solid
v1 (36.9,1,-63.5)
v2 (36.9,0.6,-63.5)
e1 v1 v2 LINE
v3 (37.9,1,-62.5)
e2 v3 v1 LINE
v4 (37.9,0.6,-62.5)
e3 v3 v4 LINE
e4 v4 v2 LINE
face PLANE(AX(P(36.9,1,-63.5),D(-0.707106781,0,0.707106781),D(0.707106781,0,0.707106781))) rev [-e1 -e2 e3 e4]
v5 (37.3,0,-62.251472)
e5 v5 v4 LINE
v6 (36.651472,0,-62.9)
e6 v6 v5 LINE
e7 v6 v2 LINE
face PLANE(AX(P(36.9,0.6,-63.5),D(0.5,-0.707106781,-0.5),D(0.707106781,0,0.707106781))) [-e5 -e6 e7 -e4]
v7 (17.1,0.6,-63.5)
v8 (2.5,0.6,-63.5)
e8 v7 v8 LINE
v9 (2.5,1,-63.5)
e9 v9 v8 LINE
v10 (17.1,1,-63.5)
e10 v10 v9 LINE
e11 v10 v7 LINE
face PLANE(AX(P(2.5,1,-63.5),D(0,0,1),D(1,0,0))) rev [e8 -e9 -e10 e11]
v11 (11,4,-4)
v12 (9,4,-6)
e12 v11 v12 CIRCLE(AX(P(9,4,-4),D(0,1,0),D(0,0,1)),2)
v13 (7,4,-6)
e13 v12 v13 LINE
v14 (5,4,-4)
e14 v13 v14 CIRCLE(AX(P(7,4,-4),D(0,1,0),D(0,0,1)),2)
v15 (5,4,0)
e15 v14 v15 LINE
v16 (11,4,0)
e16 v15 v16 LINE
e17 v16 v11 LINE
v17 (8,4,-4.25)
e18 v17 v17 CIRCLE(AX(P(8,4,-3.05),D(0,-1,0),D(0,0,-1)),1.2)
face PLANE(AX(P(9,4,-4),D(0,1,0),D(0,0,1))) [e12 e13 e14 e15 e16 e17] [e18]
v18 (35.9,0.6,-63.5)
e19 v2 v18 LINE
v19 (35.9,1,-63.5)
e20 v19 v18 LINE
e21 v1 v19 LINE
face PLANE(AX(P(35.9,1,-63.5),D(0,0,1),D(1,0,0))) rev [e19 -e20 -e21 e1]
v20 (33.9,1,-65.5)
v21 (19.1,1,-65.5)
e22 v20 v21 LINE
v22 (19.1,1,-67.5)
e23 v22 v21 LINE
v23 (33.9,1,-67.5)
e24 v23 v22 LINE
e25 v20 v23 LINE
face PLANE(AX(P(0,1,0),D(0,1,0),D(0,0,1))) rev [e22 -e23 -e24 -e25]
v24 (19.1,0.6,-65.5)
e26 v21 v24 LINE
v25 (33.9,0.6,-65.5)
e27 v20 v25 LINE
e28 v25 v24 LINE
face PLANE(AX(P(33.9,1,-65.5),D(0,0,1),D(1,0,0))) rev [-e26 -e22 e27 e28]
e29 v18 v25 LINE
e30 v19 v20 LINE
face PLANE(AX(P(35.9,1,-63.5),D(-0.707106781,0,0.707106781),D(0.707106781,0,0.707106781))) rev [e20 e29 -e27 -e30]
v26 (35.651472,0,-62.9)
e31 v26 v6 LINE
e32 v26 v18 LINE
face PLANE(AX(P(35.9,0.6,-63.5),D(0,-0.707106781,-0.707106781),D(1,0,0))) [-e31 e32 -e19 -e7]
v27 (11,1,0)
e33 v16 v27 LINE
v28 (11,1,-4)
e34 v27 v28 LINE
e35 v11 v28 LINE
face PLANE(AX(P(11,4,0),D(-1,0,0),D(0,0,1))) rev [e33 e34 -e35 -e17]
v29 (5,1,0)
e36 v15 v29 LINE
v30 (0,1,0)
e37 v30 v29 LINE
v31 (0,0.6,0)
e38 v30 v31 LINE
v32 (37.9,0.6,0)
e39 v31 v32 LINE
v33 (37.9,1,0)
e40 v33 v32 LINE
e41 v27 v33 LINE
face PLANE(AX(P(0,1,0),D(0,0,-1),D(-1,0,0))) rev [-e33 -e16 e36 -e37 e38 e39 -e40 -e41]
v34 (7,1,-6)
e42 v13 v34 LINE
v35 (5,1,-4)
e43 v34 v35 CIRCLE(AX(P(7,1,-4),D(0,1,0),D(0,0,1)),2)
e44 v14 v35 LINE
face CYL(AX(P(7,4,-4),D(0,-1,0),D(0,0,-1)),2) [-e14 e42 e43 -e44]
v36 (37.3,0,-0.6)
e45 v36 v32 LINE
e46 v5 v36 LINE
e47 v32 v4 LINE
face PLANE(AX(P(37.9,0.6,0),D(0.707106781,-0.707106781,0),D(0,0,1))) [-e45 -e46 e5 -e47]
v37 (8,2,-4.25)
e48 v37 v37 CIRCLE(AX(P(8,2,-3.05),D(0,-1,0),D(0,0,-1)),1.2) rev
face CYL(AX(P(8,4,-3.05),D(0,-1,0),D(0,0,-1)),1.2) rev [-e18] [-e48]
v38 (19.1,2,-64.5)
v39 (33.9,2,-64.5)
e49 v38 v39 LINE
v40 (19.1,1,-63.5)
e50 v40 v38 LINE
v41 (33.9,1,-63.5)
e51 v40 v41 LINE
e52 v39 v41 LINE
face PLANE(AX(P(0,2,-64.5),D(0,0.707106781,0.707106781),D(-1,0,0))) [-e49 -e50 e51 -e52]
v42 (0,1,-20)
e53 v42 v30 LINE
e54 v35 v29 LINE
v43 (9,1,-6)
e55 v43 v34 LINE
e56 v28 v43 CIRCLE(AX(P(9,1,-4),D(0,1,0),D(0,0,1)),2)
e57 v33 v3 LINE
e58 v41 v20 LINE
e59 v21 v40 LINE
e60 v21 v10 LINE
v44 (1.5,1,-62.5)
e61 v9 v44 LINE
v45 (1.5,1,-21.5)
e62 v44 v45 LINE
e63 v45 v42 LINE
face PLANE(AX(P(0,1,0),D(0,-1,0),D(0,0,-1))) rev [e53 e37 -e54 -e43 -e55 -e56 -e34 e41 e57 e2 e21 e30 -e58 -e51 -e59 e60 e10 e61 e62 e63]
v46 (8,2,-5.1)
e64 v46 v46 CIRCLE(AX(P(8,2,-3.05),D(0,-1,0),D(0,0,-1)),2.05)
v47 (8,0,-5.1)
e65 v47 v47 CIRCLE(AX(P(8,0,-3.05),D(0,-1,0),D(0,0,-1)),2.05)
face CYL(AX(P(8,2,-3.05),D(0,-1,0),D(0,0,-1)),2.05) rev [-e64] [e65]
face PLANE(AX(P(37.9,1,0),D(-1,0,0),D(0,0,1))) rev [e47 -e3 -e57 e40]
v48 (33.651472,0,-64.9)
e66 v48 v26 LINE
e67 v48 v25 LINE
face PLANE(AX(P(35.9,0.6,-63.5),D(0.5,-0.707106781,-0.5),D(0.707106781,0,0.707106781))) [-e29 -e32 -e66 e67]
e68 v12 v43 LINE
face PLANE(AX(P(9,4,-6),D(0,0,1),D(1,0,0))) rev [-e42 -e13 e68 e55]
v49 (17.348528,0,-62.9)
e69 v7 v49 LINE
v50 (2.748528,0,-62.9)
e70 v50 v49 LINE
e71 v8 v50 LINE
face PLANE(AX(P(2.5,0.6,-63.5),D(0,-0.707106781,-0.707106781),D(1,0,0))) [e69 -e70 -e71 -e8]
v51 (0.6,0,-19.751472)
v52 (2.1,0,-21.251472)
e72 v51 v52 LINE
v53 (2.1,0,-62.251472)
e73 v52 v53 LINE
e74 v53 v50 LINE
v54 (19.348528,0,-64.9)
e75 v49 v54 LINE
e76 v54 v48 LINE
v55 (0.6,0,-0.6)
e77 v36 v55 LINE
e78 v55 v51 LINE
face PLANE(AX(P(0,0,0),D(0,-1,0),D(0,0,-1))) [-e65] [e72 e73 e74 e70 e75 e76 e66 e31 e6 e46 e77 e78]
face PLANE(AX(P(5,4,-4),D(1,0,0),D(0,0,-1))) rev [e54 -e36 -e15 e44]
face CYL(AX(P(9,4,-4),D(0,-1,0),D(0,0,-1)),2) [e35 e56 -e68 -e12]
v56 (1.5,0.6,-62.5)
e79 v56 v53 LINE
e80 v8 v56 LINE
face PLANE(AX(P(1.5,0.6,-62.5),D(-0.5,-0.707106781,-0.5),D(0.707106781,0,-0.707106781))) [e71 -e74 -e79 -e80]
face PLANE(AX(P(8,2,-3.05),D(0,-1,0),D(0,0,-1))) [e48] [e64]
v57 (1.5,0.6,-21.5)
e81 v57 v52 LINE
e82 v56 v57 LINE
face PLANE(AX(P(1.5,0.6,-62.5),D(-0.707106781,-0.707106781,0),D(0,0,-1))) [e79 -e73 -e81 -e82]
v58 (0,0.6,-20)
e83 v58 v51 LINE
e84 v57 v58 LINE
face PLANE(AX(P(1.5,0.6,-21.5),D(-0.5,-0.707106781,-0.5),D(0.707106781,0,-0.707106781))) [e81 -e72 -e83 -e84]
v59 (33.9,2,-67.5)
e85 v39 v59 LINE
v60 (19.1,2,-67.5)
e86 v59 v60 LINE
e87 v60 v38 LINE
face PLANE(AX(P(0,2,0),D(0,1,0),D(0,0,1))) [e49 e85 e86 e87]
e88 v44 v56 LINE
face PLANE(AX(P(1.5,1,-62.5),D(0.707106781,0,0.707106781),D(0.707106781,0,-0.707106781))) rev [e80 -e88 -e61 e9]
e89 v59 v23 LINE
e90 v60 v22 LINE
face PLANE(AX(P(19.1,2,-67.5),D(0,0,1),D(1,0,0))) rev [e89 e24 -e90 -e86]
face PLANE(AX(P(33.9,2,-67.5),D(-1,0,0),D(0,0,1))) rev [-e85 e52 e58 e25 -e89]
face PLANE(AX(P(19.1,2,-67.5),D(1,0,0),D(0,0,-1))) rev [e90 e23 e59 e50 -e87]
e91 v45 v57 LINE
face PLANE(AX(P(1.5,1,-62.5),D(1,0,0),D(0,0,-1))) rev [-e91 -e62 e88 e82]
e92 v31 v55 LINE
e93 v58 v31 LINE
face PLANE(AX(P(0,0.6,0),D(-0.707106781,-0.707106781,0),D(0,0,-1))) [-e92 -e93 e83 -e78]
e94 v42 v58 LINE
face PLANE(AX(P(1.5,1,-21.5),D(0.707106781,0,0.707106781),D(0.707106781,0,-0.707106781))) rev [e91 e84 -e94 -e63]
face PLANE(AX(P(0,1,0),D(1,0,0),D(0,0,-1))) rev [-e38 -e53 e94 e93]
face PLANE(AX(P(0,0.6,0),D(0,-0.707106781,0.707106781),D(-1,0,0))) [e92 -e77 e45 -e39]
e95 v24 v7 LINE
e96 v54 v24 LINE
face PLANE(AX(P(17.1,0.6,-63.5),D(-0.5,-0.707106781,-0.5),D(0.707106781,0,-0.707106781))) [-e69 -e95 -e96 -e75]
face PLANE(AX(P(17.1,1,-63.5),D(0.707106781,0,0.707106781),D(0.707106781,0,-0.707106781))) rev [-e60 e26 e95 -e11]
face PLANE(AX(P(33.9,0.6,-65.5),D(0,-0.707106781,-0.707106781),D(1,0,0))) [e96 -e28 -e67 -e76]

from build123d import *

# Parameters (mm, degrees)
EXTRUDE_1_DEPTH     = 1
CHAMFER_1_SIZE      = 0.6
SKETCH_2_W          = 14.8
SKETCH_2_H          = 4
EXTRUDE_2_DEPTH     = 1
EXTRUDE_3_DEPTH     = 3
SKETCH_4_R          = 1.2
CUT_EXTRUDE_1_DEPTH = 78.515546828
SKETCH_5_R          = 2.05
CUT_EXTRUDE_2_DEPTH = 2
CHAMFER_2_SIZE      = 1


with BuildPart() as part:
    # 草图1 → 凸台-拉伸1 (new body)
    with BuildSketch(Plane(origin=(0, 0, 0), x_dir=(1, 0, 0), z_dir=(0, 1, 0))):
        Polygon((0, 0), (37.9, 0), (37.9, 62.5), (36.9, 63.5), (35.9, 63.5), (33.9, 65.5), (19.1, 65.5), (17.1, 63.5), (2.5, 63.5), (1.5, 62.5), (1.5, 21.5), (0, 20), align=None)
    extrude(amount=EXTRUDE_1_DEPTH)

    # 倒角1
    chamfer_1_edges = [part.edges().sort_by_distance(p)[0] for p in [
        (0.75, 0, -20.75),
        (1.5, 0, -42),
        (2, 0, -63),
        (9.8, 0, -63.5),
        (18.1, 0, -64.5),
        (26.5, 0, -65.5),
        (34.9, 0, -64.5),
        (36.4, 0, -63.5),
        (37.4, 0, -63),
        (37.9, 0, -31.25),
        (18.95, 0, 0),
        (0, 0, -10),
    ]]
    chamfer(chamfer_1_edges, length=CHAMFER_1_SIZE)

    # 草图2 → 凸台-拉伸2 (add)
    with BuildSketch(Plane(origin=(0, 1, 0), x_dir=(1, 0, 0), z_dir=(0, 1, 0))):
        with Locations((26.5, 65.5)):
            Rectangle(SKETCH_2_W, SKETCH_2_H)
    extrude(amount=EXTRUDE_2_DEPTH)

    # 草图3 → 凸台-拉伸3 (add)
    with BuildSketch(Plane(origin=(0, 1, 0), x_dir=(1, 0, 0), z_dir=(0, 1, 0))):
        with BuildLine():
            Line((5, 4), (5, 0))
            Line((5, 0), (11, 0))
            Line((11, 0), (11, 4))
            ThreePointArc((11, 4), (10.414213562, 5.414213562), (9, 6))
            Line((9, 6), (7, 6))
            ThreePointArc((7, 6), (5.585786438, 5.414213562), (5, 4))
        make_face()
    extrude(amount=EXTRUDE_3_DEPTH)

    # 草图4 → 切除-拉伸1 (cut, through all)
    with BuildSketch(Plane.XZ):
        with Locations(Location((8, -3.05, 0), (0, 0, 270))):
            Circle(SKETCH_4_R)
    extrude(amount=-CUT_EXTRUDE_1_DEPTH, mode=Mode.SUBTRACT)

    # 草图5 → 切除-拉伸2 (cut)
    with BuildSketch(Plane.XZ):
        with Locations(Location((8, -3.05, 0), (0, 0, 270))):
            Circle(SKETCH_5_R)
    extrude(amount=-CUT_EXTRUDE_2_DEPTH, mode=Mode.SUBTRACT)

    # 倒角2
    chamfer_2_edges = [part.edges().sort_by_distance(p)[0] for p in [
        (26.5, 2, -63.5),
    ]]
    chamfer(chamfer_2_edges, length=CHAMFER_2_SIZE - 0.0001)  # a hair under: the kernel refuses the full size


solid = part.part
